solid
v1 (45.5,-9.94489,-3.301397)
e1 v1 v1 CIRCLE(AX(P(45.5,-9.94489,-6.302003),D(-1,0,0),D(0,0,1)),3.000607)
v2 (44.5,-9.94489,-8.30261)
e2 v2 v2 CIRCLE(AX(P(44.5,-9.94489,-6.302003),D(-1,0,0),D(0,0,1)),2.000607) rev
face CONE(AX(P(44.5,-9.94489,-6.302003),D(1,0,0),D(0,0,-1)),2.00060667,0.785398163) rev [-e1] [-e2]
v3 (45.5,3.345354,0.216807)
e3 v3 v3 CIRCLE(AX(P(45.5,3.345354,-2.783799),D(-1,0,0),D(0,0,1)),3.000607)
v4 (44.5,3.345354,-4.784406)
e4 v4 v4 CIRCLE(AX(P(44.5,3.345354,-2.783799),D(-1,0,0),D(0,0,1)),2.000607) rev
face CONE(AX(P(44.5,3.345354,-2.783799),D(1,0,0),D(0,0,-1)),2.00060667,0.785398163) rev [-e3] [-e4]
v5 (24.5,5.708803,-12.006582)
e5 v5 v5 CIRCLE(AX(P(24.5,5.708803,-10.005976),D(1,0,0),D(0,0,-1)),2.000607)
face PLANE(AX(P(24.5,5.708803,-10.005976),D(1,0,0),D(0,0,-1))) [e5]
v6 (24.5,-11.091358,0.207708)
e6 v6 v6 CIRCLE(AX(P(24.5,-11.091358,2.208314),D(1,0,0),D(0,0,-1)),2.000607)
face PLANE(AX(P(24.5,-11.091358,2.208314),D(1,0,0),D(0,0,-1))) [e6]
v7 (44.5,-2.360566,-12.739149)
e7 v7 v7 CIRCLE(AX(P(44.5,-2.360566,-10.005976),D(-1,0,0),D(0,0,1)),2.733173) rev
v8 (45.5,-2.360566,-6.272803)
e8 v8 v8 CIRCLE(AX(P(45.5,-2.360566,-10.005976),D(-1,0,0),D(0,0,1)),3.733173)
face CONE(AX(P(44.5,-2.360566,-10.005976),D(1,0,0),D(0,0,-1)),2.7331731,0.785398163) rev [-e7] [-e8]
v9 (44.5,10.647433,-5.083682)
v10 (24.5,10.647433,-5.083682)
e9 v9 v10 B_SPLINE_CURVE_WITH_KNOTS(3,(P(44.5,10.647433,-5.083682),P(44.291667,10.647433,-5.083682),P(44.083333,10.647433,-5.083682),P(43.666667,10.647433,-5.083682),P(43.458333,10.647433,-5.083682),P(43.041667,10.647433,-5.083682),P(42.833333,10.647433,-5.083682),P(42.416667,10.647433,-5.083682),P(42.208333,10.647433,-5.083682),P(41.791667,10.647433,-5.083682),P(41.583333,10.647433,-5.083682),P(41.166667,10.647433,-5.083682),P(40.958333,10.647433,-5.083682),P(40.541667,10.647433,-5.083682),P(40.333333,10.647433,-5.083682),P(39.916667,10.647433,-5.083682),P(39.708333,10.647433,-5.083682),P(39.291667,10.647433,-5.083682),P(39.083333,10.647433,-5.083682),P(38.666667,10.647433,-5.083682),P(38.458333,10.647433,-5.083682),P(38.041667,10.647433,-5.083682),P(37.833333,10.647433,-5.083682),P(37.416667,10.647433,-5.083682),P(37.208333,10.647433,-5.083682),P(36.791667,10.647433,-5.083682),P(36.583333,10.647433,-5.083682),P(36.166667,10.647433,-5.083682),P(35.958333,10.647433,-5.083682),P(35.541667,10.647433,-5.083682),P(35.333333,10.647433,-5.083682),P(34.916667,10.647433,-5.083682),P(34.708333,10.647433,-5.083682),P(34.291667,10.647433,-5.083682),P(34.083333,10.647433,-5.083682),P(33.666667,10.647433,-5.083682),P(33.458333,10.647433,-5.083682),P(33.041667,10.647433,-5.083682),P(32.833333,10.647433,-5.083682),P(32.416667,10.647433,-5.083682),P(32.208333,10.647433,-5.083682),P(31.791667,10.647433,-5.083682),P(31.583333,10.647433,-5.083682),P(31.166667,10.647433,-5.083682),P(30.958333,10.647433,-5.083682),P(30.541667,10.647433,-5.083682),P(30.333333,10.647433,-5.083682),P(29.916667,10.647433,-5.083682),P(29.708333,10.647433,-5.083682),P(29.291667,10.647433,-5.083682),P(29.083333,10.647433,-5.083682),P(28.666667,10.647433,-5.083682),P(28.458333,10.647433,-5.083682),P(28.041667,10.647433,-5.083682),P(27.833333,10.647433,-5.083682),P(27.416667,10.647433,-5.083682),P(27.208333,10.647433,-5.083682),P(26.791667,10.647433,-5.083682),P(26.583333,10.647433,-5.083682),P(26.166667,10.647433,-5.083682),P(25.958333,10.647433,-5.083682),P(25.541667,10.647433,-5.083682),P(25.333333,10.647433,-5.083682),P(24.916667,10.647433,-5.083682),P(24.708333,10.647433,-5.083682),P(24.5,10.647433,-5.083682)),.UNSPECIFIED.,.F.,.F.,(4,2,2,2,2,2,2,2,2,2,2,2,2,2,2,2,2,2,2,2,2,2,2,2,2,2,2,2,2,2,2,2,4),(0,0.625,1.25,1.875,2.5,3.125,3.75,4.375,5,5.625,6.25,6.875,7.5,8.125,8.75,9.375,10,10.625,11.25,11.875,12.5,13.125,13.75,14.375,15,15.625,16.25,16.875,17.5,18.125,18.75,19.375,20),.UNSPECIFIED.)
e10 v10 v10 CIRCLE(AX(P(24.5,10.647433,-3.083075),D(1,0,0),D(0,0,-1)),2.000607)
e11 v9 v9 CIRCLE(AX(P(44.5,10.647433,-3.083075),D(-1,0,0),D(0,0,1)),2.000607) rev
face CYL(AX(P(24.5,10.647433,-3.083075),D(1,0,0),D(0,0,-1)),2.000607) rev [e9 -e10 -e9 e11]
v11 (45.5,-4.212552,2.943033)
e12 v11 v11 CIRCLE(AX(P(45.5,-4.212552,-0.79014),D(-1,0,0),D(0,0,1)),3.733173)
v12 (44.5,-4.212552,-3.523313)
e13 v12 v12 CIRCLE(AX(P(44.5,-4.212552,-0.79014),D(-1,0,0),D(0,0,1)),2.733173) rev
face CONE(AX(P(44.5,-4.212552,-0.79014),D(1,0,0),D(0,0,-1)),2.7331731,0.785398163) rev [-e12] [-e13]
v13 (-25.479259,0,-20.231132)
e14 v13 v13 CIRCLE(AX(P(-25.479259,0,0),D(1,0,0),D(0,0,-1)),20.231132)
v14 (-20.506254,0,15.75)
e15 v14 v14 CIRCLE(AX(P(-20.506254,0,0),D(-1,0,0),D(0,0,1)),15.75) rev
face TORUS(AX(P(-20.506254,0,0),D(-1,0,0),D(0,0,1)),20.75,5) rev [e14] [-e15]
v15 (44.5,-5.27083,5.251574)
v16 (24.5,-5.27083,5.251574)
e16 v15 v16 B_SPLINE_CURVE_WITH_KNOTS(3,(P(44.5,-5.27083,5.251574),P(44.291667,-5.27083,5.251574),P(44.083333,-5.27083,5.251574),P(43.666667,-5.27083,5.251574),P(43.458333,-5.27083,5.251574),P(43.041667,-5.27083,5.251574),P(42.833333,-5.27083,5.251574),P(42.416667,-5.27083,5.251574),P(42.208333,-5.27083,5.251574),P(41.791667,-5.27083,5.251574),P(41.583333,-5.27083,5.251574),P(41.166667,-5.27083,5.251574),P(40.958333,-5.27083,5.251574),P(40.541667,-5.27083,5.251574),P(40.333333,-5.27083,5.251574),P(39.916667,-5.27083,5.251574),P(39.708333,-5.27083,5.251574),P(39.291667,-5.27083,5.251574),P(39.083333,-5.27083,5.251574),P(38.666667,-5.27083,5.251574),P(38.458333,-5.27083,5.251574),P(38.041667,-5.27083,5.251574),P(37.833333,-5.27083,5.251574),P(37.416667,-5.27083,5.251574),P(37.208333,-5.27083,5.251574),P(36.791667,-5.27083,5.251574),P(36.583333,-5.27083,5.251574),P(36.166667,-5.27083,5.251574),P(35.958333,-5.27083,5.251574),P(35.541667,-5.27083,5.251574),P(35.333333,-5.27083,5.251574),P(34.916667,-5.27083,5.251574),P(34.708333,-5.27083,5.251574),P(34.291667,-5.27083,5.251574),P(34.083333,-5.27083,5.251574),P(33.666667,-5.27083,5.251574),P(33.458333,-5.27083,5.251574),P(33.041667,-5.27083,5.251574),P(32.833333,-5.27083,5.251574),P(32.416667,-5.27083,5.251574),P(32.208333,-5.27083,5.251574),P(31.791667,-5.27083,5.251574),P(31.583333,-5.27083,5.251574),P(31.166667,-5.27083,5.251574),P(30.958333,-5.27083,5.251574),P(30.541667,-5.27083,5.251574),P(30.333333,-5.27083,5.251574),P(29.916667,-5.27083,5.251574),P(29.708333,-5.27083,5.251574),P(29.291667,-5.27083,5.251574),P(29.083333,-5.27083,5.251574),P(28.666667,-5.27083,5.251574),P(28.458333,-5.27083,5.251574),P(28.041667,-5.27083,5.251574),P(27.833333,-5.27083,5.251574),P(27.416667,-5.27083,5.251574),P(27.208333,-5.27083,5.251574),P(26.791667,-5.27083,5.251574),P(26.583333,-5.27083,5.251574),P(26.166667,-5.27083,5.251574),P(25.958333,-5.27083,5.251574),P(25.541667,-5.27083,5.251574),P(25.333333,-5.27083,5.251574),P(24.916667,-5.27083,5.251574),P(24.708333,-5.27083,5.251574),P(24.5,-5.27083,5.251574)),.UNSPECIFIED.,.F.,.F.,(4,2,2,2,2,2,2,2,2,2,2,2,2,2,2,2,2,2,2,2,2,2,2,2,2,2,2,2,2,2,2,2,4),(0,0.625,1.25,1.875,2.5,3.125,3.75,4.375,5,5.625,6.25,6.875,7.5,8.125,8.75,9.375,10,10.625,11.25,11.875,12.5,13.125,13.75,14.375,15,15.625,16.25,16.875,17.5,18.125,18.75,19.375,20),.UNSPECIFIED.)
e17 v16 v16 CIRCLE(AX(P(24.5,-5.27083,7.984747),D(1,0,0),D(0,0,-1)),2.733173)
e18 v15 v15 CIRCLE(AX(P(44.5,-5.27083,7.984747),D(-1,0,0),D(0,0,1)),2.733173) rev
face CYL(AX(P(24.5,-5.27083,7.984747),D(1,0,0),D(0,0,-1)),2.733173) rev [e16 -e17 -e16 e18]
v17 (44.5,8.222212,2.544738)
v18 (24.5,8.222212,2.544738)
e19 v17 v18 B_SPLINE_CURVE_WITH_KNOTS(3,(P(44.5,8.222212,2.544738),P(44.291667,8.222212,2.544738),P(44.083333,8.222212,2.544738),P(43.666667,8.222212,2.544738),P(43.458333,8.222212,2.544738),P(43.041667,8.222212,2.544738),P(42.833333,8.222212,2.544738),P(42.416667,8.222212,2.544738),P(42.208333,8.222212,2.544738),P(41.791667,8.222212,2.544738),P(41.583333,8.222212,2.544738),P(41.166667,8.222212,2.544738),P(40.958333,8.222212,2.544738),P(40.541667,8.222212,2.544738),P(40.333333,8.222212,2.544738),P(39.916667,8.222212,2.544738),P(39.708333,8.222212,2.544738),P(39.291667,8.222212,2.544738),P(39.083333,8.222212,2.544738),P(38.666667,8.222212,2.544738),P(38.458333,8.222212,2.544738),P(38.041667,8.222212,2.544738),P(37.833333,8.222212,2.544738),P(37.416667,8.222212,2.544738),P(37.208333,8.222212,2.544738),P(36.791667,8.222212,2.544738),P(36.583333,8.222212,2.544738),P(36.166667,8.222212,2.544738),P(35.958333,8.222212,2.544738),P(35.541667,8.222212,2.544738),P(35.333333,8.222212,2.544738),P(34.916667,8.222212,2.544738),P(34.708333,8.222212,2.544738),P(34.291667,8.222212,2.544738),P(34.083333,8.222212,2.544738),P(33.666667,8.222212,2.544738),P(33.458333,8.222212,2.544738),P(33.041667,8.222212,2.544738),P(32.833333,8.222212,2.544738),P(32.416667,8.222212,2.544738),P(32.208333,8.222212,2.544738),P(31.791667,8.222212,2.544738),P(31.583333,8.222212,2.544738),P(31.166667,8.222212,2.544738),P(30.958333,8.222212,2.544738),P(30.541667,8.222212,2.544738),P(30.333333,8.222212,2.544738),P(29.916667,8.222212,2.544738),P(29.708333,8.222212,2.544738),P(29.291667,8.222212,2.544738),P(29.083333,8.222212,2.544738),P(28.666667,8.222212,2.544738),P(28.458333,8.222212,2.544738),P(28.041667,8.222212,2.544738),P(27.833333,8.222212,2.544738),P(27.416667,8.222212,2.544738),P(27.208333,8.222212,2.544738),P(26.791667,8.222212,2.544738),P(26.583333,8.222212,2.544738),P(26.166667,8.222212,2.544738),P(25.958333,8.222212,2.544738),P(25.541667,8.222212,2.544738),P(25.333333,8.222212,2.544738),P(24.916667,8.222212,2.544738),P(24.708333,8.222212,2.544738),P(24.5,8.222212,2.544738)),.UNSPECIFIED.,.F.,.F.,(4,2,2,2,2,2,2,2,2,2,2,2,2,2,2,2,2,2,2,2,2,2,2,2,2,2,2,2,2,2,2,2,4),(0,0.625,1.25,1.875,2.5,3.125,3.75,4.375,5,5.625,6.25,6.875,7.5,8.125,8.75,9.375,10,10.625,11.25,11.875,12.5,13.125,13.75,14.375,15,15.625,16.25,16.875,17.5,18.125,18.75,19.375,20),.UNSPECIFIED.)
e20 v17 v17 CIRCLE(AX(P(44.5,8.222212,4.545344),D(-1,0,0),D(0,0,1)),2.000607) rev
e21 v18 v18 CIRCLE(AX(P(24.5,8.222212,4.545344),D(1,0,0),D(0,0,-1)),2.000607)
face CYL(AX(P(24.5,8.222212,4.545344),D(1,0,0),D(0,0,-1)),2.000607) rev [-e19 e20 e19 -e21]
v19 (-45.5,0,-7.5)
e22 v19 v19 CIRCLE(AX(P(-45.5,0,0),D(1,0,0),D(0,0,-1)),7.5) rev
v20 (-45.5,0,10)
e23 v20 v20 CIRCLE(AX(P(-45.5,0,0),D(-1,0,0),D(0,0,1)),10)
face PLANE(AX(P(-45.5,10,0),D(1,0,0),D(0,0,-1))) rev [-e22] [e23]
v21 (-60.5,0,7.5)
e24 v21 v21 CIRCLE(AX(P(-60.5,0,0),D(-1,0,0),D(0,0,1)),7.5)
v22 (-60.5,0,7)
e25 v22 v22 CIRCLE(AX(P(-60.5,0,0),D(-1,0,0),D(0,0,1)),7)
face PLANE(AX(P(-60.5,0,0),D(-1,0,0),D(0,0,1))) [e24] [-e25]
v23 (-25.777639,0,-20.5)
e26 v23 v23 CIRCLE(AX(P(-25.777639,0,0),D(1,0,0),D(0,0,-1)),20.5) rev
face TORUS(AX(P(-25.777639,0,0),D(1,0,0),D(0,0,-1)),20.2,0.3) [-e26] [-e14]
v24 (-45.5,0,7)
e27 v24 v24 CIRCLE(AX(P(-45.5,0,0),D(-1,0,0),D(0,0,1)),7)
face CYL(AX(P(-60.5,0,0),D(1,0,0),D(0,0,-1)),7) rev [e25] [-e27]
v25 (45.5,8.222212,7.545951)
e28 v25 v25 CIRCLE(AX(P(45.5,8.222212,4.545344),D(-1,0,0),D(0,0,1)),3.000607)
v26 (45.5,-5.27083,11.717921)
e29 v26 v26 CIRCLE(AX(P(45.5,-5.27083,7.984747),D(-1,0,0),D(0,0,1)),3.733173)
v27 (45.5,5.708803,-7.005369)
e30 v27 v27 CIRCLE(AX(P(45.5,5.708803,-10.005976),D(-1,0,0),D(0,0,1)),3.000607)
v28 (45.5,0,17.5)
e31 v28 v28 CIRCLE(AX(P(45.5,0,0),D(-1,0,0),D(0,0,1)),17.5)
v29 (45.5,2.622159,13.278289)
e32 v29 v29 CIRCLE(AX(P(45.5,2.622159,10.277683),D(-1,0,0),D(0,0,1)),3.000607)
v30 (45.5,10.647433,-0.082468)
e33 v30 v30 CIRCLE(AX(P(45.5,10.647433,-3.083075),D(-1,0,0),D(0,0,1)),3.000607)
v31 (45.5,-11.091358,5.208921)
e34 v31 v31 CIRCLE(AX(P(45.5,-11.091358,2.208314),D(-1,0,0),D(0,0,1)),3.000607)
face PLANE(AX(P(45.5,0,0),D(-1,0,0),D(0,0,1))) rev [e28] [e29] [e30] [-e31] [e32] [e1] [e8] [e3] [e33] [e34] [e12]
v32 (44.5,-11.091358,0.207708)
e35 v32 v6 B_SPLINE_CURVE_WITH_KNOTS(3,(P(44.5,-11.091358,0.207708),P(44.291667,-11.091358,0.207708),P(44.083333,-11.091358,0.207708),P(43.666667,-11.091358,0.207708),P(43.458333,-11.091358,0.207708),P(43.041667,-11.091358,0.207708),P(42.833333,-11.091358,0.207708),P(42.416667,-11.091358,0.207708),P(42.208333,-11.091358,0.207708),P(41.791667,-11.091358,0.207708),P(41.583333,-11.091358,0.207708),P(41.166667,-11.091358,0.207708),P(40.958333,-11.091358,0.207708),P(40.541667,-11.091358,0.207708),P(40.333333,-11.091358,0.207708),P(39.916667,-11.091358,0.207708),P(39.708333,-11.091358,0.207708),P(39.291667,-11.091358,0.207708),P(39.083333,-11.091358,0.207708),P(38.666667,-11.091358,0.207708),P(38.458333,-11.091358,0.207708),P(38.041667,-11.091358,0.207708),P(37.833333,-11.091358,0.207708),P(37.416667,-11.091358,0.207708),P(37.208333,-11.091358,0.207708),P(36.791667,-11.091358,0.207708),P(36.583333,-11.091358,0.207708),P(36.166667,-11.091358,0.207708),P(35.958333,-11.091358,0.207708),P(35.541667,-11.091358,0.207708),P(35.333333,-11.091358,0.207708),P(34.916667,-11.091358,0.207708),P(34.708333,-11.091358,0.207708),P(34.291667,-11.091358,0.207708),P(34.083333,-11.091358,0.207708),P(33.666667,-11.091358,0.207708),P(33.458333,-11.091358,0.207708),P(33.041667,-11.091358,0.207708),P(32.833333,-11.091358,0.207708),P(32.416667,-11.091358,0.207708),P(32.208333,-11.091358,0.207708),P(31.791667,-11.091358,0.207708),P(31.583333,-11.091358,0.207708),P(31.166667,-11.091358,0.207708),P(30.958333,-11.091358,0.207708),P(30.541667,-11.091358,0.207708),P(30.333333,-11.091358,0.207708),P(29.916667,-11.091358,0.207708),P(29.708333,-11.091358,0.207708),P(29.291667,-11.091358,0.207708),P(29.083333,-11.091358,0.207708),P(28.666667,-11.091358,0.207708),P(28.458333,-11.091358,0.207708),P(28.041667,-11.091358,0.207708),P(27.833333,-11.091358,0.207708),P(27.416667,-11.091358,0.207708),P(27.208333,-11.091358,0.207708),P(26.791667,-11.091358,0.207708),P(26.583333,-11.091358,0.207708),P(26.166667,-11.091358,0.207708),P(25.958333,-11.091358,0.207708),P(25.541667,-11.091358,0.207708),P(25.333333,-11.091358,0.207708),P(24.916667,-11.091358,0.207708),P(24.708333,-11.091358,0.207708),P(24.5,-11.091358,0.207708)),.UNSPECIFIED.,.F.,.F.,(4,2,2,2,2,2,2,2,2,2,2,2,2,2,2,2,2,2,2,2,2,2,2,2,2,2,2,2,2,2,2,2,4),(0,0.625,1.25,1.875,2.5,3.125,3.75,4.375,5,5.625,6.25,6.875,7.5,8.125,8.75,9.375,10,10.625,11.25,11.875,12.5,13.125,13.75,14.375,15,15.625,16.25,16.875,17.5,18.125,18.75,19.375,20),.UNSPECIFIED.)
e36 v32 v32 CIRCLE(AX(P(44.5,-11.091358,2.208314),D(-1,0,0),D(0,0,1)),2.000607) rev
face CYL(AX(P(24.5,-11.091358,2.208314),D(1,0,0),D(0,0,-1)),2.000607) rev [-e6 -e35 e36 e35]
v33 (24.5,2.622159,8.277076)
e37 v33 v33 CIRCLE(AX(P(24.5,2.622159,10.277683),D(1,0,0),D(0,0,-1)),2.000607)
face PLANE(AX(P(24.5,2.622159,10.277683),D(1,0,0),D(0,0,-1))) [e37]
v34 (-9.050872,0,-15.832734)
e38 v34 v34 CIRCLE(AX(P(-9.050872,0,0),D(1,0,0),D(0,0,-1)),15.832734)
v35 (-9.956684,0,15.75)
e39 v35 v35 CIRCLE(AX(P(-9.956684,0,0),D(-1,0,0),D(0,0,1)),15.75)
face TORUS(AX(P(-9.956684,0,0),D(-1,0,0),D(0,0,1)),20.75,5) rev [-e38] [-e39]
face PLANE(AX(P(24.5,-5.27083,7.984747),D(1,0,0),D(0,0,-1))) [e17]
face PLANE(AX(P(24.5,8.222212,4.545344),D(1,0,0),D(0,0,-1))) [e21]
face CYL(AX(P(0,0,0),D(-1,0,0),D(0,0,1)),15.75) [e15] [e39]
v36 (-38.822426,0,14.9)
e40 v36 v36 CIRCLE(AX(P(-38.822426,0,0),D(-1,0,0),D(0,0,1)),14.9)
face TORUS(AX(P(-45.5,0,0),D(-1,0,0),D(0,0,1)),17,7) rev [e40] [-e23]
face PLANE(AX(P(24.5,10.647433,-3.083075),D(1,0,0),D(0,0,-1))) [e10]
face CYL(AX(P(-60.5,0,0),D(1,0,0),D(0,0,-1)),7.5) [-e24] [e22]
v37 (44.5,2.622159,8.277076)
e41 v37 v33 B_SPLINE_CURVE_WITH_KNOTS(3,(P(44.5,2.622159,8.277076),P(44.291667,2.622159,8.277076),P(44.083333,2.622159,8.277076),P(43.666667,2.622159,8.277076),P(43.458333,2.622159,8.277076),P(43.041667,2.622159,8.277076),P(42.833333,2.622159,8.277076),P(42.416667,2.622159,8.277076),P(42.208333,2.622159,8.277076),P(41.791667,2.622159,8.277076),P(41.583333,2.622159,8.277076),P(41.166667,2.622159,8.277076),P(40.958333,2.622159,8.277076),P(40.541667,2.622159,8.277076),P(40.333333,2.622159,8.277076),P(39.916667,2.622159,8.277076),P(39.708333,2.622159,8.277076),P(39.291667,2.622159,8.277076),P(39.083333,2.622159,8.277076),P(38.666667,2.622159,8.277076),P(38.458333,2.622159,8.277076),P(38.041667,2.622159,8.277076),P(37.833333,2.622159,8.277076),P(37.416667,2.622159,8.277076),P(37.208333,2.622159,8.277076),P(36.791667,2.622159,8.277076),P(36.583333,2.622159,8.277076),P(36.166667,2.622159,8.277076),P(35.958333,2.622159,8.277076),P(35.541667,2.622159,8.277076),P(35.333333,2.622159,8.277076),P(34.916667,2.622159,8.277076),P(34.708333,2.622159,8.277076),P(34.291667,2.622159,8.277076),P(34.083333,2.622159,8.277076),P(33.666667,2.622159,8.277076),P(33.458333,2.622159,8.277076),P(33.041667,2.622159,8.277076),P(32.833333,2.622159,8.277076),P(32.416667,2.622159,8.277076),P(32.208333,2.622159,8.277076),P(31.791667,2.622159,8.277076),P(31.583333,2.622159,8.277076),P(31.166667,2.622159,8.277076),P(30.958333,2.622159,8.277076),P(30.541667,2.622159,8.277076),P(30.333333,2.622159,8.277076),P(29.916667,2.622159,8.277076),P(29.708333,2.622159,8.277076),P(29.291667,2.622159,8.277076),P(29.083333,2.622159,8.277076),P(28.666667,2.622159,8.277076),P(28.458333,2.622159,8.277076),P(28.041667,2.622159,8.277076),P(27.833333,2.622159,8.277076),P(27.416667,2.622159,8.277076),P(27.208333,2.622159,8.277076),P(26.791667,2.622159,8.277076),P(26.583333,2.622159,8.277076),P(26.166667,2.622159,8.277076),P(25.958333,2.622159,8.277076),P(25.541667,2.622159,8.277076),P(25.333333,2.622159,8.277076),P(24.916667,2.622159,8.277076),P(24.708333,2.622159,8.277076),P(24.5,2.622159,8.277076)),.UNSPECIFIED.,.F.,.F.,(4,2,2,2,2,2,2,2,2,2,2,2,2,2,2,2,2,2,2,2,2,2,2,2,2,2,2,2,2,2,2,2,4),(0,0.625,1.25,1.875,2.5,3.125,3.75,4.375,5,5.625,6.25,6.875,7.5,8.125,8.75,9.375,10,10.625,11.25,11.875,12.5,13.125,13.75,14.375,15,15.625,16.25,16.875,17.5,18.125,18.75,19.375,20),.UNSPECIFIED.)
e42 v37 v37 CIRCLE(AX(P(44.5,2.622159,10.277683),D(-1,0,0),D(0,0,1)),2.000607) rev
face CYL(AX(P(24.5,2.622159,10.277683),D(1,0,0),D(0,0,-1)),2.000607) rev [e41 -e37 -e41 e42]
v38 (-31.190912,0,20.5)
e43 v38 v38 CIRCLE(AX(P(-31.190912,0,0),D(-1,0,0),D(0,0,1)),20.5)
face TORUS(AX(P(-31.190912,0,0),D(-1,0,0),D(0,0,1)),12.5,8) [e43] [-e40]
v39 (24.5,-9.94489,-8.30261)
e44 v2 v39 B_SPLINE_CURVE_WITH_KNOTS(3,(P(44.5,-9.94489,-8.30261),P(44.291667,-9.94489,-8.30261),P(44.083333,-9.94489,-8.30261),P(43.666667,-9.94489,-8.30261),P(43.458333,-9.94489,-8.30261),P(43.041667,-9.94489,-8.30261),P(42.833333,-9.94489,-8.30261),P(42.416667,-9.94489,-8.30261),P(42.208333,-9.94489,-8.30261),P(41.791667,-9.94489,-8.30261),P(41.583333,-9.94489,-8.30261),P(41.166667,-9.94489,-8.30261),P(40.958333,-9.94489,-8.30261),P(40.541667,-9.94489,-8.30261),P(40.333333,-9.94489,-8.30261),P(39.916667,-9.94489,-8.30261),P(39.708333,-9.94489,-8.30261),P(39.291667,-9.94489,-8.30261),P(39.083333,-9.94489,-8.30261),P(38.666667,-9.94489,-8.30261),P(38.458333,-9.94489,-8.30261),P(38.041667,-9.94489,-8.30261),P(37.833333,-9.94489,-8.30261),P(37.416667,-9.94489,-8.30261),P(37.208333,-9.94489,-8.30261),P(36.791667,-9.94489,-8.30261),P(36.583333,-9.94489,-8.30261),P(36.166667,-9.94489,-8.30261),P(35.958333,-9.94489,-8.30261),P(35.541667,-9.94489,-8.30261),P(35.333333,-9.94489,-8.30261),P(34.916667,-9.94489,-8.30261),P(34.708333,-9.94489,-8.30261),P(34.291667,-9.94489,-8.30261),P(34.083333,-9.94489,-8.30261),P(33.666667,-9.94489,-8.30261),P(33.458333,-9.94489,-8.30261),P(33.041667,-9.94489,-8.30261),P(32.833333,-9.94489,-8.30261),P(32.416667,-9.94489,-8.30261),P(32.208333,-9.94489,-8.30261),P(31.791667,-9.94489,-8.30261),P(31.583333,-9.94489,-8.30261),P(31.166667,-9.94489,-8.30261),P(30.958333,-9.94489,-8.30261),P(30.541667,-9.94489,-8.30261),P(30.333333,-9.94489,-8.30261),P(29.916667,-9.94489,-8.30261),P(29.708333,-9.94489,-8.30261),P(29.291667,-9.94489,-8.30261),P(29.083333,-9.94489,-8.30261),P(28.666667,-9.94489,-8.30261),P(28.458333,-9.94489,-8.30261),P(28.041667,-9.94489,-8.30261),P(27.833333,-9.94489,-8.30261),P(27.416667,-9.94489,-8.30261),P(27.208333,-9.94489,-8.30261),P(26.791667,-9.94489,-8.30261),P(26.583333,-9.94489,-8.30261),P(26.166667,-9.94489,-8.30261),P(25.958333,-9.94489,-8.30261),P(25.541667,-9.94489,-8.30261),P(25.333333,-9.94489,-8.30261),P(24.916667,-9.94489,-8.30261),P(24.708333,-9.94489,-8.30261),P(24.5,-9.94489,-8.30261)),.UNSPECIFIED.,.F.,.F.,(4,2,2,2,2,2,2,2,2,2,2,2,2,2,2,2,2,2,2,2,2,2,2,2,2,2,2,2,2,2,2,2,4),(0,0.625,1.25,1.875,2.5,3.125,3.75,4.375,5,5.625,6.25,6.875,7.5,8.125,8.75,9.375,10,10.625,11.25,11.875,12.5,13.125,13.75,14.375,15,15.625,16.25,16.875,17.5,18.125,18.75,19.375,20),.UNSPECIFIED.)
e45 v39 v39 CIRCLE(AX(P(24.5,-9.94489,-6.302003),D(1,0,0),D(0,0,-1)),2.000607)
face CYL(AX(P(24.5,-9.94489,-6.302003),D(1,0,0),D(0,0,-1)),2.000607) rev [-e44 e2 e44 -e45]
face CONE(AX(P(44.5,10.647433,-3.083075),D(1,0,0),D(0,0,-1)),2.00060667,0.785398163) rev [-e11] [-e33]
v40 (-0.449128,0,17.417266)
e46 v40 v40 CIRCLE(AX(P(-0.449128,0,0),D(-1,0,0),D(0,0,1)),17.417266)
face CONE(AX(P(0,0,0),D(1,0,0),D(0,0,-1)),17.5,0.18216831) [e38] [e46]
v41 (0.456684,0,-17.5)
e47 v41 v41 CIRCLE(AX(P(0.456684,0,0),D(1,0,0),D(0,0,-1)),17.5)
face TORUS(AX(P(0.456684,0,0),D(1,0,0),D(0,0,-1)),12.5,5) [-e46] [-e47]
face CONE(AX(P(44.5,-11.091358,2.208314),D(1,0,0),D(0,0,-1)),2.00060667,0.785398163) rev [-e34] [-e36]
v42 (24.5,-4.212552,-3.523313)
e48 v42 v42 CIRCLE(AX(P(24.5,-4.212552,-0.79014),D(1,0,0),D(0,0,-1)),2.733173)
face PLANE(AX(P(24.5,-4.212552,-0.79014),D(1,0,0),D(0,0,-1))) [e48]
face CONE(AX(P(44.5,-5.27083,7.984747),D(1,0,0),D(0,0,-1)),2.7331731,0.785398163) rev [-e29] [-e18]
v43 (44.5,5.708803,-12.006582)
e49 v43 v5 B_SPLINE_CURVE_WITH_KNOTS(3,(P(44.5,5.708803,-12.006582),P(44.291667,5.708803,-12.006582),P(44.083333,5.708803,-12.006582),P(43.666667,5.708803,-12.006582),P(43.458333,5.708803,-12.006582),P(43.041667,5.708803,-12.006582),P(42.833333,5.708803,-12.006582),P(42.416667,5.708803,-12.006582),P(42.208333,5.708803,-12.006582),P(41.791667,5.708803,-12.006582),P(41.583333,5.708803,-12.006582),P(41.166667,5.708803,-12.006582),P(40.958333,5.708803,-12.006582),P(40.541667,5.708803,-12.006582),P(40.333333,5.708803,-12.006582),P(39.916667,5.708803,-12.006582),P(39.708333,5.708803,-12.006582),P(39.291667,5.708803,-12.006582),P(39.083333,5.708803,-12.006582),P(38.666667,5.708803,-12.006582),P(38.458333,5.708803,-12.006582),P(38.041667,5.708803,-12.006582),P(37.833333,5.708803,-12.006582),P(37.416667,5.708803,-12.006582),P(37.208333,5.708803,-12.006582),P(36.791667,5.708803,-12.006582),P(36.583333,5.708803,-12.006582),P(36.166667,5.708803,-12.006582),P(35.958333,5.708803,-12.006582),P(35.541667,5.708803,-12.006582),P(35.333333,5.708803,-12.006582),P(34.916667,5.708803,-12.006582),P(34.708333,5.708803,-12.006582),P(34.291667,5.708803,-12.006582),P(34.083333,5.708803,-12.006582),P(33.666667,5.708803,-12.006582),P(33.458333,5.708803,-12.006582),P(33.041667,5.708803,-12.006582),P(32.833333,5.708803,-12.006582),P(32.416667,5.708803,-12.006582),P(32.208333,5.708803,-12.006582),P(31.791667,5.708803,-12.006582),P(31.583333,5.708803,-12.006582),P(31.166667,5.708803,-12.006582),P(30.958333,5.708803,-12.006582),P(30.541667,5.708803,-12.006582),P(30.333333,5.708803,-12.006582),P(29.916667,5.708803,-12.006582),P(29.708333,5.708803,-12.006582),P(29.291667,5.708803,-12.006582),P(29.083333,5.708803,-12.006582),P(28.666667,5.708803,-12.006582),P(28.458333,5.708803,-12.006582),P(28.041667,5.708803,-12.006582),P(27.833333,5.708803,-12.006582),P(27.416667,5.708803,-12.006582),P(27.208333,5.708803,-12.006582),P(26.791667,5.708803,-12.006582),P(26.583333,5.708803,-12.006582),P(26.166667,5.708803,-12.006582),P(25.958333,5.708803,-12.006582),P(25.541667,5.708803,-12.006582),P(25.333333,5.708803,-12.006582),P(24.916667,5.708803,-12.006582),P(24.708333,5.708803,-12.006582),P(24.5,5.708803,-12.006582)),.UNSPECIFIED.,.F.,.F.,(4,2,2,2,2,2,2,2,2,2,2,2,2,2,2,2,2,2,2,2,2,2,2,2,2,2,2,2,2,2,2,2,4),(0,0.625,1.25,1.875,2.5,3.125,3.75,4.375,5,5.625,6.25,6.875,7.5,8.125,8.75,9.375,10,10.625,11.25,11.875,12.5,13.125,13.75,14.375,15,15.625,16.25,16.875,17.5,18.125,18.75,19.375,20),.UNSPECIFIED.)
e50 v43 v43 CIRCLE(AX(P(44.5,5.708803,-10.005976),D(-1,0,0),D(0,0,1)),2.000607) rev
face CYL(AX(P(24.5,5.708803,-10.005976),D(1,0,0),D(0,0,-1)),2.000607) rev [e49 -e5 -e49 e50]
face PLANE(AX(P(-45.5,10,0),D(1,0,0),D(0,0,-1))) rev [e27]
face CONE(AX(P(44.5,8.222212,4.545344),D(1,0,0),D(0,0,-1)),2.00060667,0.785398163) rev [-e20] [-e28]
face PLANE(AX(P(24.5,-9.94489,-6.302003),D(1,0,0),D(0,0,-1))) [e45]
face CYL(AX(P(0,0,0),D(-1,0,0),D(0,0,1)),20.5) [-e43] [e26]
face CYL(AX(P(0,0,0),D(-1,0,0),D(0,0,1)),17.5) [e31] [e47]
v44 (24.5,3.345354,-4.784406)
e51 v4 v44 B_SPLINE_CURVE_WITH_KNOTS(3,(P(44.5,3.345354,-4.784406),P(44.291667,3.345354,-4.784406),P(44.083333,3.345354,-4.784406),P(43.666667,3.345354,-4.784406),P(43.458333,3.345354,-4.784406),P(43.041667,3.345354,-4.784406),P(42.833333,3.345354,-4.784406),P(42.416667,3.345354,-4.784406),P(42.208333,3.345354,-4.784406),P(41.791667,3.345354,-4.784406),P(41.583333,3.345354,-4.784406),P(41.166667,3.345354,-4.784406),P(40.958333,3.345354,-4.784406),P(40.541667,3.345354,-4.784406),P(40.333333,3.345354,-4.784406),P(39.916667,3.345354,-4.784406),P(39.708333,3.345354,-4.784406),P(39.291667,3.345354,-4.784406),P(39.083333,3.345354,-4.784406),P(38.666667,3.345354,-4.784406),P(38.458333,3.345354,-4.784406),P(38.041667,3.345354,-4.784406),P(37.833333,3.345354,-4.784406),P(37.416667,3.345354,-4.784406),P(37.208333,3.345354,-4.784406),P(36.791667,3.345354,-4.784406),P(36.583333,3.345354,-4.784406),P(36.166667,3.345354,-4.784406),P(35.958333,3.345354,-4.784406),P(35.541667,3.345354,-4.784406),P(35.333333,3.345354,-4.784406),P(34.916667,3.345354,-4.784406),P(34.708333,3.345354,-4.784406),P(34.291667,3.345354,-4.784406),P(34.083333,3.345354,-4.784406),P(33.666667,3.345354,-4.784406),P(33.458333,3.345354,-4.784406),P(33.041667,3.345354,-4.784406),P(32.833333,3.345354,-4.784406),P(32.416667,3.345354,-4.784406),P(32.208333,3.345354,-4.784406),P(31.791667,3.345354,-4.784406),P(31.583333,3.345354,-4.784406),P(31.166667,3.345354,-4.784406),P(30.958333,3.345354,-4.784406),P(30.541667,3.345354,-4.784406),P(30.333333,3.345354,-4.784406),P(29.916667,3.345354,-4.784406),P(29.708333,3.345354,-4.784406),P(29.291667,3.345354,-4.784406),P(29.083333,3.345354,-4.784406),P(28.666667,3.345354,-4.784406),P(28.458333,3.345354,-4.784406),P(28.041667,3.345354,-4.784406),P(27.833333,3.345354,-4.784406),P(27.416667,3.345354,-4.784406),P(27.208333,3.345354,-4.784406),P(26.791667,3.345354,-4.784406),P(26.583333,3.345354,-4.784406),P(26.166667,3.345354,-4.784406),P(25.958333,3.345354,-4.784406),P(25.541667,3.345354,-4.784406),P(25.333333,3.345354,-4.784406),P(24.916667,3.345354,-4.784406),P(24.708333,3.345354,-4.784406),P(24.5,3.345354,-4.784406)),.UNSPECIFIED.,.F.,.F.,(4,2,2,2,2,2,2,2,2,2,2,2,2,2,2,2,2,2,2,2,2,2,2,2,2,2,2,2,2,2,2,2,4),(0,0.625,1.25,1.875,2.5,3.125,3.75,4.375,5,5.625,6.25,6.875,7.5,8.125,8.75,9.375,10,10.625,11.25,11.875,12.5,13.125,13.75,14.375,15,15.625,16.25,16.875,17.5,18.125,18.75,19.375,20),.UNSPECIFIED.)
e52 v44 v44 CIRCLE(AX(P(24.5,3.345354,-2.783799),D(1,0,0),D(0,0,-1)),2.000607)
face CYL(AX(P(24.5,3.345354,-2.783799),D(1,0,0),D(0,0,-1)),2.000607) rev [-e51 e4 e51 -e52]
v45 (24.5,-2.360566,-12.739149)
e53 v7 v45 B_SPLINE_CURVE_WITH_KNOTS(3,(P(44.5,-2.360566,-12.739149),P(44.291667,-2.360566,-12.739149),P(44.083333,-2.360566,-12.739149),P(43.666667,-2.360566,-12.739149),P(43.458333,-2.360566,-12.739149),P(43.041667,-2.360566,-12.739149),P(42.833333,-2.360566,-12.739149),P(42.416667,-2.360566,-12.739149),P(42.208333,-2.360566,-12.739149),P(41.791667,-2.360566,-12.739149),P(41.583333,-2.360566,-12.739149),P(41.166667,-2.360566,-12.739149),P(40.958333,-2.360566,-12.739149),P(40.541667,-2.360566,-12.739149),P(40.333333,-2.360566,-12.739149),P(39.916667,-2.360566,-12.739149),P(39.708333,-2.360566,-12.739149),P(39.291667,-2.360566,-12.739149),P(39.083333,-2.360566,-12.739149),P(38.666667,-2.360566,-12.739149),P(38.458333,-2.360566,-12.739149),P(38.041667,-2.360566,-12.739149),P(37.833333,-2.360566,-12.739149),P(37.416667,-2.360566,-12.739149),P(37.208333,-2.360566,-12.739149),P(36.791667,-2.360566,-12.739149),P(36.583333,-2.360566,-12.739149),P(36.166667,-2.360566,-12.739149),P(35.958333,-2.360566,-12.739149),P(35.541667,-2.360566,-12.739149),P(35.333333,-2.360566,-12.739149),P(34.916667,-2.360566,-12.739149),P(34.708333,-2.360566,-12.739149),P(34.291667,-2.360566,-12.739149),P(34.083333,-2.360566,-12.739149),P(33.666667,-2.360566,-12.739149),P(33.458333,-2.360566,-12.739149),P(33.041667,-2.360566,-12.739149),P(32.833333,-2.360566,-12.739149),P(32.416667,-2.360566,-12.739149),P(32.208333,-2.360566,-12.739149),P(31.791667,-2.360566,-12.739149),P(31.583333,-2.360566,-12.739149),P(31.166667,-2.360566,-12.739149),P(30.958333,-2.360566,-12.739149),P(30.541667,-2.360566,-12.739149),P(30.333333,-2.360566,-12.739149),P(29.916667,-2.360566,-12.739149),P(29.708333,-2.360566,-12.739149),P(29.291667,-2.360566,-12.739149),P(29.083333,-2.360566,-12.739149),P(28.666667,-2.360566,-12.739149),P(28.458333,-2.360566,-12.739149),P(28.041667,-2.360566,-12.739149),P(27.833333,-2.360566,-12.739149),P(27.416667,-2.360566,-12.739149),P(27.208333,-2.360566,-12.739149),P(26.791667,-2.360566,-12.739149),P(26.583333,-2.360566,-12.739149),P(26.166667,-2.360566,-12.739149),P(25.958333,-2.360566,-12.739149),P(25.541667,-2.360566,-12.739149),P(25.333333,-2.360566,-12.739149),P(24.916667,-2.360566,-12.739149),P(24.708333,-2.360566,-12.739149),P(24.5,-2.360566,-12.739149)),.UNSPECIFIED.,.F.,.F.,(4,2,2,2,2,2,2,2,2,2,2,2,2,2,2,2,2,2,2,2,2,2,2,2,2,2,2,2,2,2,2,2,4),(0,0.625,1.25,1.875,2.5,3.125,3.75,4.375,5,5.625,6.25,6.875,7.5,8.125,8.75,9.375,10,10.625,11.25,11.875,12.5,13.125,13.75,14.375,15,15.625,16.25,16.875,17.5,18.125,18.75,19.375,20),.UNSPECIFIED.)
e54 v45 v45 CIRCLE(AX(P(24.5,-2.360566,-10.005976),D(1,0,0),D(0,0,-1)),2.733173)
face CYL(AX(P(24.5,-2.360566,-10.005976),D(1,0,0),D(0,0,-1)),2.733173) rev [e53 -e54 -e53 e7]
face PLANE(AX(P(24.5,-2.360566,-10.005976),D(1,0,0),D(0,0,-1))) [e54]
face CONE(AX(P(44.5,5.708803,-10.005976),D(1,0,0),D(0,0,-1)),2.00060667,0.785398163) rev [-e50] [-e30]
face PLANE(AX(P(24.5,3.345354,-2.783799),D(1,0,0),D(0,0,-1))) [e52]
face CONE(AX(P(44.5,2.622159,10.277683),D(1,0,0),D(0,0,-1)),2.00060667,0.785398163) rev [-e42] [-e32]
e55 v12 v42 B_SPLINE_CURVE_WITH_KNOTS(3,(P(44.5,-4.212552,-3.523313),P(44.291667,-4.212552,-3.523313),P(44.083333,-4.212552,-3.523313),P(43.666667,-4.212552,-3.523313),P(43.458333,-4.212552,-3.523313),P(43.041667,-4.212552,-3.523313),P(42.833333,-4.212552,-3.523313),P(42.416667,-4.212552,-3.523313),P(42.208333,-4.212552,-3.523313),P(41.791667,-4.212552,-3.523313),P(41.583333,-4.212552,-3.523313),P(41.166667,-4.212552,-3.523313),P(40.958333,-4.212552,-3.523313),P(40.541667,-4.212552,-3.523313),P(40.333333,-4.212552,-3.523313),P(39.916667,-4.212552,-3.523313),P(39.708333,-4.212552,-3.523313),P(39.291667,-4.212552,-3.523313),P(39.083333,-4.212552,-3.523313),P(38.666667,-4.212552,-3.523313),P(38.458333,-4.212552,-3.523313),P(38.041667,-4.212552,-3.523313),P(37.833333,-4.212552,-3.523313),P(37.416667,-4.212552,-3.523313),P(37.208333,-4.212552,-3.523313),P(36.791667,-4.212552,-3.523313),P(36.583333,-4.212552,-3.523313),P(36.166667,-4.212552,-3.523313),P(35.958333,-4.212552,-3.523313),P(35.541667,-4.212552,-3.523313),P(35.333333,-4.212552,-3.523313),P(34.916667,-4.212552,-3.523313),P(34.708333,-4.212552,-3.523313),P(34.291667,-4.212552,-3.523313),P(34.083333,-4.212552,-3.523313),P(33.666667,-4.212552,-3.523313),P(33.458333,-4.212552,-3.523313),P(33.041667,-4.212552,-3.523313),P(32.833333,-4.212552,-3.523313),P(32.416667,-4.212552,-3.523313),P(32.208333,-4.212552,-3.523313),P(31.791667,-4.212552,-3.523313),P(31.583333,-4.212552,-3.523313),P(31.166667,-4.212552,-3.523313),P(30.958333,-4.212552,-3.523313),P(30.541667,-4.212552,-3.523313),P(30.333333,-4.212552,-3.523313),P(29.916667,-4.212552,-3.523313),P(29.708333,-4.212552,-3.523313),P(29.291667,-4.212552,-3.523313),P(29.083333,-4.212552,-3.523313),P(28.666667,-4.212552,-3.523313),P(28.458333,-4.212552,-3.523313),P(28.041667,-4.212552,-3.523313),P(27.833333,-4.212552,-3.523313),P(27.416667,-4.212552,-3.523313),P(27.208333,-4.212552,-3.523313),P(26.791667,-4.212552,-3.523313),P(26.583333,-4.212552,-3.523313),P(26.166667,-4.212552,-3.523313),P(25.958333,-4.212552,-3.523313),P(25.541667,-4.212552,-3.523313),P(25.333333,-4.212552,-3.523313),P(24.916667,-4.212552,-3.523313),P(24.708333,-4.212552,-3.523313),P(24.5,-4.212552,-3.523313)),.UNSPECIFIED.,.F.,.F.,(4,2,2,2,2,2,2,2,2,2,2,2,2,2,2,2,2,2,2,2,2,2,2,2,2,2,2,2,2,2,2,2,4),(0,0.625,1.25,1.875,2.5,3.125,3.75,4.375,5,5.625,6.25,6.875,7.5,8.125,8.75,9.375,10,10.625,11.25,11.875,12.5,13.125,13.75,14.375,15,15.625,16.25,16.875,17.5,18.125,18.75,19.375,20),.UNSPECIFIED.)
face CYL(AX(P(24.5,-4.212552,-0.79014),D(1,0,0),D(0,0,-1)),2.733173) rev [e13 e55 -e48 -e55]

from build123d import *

# Parameters (mm, degrees)
FILLET1_R           = 5
FILLET2_R           = 0.3
FILLET3_R           = 5
SKETCH6_R           = 2.0006066698857174
SKETCH6_R_2         = 2.000606669885716
SKETCH6_R_3         = 2.733173099565215
SKETCH6_R_4         = 2.733173099565216
CUT_EXTRUDE1_DEPTH  = 21
CHAMFER1_SIZE       = 1
SKETCH7_R           = 7.5
SKETCH7_R_2         = 7
EXTRUDE_THIN1_DEPTH = 15


with BuildPart() as part:
    # Sketch3 → Revolve1 (revolve)
    with BuildSketch(Plane.XY, mode=Mode.PRIVATE) as revolve1_sk:
        with BuildLine():
            Line((45.5, 0), (45.5, 17.499999999999996))
            Line((45.5, 17.499999999999996), (0, 17.500000000006253))
            Line((0, 17.500000000006253), (-9.5, 15.75))
            Line((-9.5, 15.75), (-25.499999999999996, 15.749999999999996))
            Line((-25.499999999999996, 15.749999999999996), (-25.499999999999996, 20.5))
            Line((-25.499999999999996, 20.5), (-31.190911978745817, 20.5))
            ThreePointArc((-31.190911978745817, 20.5), (-35.92377580522551, 18.949806198638836), (-38.82242559008138, 14.9))
            ThreePointArc((-38.82242559008138, 14.9), (-41.358744151830265, 11.356419576191016), (-45.5, 10))
            Line((-45.5, 10), (-45.5, 0))
            Line((-45.5, 0), (45.5, 0))
        make_face()
    revolve(revolve1_sk.sketch.rotate(Axis((0, 0, 0), (1, 0, 0)), 90), axis=Axis((0, 0, 0), (1, 0, 0)))

    # Fillet1
    # the kernel refuses this fillet: 5 mm, written as the material it adds along each edge
    with BuildSketch(Plane(origin=(-25.499999999999996, 0, 0), x_dir=(0, 1.1e-16, 1), z_dir=(0, 1, -1.1e-16))) as fillet1_piece_1:
        with BuildLine():
            CenterArc((20.75, 4.993746088859542), FILLET1_R, 180, 87.13401601740111)
            Line((20.5, -3.55e-15), (20.495, -0.09987492177719304))
            ThreePointArc((20.495, -0.09987492177719304), (18.125, -0.10000000000000142), (15.749999999999996, -0.10000000000000142))
            Line((15.749999999999996, -0.10000000000000142), (15.649999999999997, 0))
            Line((15.649999999999997, 0), (15.65, 4.993746088859542))
            Line((15.65, 4.993746088859542), (15.75, 4.993746088859542))
        make_face()
    revolve(axis=Axis((-25.499999999999996, 0, 0), (1, 0, 0)))

    # Fillet2
    fillet2_edges = [part.edges().sort_by_distance(p)[0] for p in [
        (-25.499999999999996, -1.389e-14, -20.5),
    ]]
    fillet(fillet2_edges, radius=FILLET2_R)

    # Fillet3
    fillet3_edges = [part.edges().sort_by_distance(p)[0] for p in [
        (0, -4.09e-15, -17.500000000006253),
        (-9.5, -3.68e-15, -15.75),
    ]]
    fillet(fillet3_edges, radius=FILLET3_R)

    # Sketch6 → Cut-Extrude1 (cut)
    with BuildSketch(Plane(origin=(45.5, 0, 0), x_dir=(0, 0, -1), z_dir=(1, 0, 0))):
        with Locations((2.783799240820242, 3.3453538559838196)):
            Circle(SKETCH6_R)
        with Locations((3.0830749079385766, 10.64743253142253)):
            Circle(SKETCH6_R_2)
        with Locations((-4.545344467144663, 8.222212498881614)):
            Circle(SKETCH6_R)
        with Locations((-10.277682725877737, 2.6221589691962284)):
            Circle(SKETCH6_R_2)
        with Locations((10.005975728100823, 5.708802646975575)):
            Circle(SKETCH6_R_2)
        with Locations((-2.2083142539688767, -11.091357942080581)):
            Circle(SKETCH6_R)
        with Locations((6.30200331476561, -9.944890290333964)):
            Circle(SKETCH6_R_2)
        with Locations((10.005975728100823, -2.3605658249332846)):
            Circle(SKETCH6_R_3)
        with Locations((0.7901396044453501, -4.212552031600895)):
            Circle(SKETCH6_R_3)
        with Locations((-7.98474742238451, -5.270829863982385)):
            Circle(SKETCH6_R_4)
    extrude(amount=-CUT_EXTRUDE1_DEPTH, mode=Mode.SUBTRACT)

    # Chamfer1
    chamfer1_edges = [part.edges().sort_by_distance(p)[0] for p in [
        (45.5, 5.708802646975575, -8.005369058215107),
        (45.5, 2.622158969196229, 12.278289395763453),
        (45.5, 8.222212498881614, 6.5459511370303805),
        (45.5, 10.64743253142253, -1.0824682380528605),
        (45.5, -11.091357942080581, 4.208920923854594),
        (45.5, -9.944890290333964, -4.301396644879894),
        (45.5, -2.3605658249332855, -7.272802628535608),
        (45.5, -4.212552031600896, 1.943033495119865),
        (45.5, -5.270829863982385, 10.717920521949726),
        (45.5, 3.34535385598382, -0.7831925709345247),
    ]]
    chamfer(chamfer1_edges, length=CHAMFER1_SIZE)

    # Sketch7 → Extrude-Thin1 (add)
    with BuildSketch(Plane.ZY.offset(45.5)):
        Circle(SKETCH7_R)
        Circle(SKETCH7_R_2, mode=Mode.SUBTRACT)
    extrude(amount=EXTRUDE_THIN1_DEPTH)


solid = part.part
